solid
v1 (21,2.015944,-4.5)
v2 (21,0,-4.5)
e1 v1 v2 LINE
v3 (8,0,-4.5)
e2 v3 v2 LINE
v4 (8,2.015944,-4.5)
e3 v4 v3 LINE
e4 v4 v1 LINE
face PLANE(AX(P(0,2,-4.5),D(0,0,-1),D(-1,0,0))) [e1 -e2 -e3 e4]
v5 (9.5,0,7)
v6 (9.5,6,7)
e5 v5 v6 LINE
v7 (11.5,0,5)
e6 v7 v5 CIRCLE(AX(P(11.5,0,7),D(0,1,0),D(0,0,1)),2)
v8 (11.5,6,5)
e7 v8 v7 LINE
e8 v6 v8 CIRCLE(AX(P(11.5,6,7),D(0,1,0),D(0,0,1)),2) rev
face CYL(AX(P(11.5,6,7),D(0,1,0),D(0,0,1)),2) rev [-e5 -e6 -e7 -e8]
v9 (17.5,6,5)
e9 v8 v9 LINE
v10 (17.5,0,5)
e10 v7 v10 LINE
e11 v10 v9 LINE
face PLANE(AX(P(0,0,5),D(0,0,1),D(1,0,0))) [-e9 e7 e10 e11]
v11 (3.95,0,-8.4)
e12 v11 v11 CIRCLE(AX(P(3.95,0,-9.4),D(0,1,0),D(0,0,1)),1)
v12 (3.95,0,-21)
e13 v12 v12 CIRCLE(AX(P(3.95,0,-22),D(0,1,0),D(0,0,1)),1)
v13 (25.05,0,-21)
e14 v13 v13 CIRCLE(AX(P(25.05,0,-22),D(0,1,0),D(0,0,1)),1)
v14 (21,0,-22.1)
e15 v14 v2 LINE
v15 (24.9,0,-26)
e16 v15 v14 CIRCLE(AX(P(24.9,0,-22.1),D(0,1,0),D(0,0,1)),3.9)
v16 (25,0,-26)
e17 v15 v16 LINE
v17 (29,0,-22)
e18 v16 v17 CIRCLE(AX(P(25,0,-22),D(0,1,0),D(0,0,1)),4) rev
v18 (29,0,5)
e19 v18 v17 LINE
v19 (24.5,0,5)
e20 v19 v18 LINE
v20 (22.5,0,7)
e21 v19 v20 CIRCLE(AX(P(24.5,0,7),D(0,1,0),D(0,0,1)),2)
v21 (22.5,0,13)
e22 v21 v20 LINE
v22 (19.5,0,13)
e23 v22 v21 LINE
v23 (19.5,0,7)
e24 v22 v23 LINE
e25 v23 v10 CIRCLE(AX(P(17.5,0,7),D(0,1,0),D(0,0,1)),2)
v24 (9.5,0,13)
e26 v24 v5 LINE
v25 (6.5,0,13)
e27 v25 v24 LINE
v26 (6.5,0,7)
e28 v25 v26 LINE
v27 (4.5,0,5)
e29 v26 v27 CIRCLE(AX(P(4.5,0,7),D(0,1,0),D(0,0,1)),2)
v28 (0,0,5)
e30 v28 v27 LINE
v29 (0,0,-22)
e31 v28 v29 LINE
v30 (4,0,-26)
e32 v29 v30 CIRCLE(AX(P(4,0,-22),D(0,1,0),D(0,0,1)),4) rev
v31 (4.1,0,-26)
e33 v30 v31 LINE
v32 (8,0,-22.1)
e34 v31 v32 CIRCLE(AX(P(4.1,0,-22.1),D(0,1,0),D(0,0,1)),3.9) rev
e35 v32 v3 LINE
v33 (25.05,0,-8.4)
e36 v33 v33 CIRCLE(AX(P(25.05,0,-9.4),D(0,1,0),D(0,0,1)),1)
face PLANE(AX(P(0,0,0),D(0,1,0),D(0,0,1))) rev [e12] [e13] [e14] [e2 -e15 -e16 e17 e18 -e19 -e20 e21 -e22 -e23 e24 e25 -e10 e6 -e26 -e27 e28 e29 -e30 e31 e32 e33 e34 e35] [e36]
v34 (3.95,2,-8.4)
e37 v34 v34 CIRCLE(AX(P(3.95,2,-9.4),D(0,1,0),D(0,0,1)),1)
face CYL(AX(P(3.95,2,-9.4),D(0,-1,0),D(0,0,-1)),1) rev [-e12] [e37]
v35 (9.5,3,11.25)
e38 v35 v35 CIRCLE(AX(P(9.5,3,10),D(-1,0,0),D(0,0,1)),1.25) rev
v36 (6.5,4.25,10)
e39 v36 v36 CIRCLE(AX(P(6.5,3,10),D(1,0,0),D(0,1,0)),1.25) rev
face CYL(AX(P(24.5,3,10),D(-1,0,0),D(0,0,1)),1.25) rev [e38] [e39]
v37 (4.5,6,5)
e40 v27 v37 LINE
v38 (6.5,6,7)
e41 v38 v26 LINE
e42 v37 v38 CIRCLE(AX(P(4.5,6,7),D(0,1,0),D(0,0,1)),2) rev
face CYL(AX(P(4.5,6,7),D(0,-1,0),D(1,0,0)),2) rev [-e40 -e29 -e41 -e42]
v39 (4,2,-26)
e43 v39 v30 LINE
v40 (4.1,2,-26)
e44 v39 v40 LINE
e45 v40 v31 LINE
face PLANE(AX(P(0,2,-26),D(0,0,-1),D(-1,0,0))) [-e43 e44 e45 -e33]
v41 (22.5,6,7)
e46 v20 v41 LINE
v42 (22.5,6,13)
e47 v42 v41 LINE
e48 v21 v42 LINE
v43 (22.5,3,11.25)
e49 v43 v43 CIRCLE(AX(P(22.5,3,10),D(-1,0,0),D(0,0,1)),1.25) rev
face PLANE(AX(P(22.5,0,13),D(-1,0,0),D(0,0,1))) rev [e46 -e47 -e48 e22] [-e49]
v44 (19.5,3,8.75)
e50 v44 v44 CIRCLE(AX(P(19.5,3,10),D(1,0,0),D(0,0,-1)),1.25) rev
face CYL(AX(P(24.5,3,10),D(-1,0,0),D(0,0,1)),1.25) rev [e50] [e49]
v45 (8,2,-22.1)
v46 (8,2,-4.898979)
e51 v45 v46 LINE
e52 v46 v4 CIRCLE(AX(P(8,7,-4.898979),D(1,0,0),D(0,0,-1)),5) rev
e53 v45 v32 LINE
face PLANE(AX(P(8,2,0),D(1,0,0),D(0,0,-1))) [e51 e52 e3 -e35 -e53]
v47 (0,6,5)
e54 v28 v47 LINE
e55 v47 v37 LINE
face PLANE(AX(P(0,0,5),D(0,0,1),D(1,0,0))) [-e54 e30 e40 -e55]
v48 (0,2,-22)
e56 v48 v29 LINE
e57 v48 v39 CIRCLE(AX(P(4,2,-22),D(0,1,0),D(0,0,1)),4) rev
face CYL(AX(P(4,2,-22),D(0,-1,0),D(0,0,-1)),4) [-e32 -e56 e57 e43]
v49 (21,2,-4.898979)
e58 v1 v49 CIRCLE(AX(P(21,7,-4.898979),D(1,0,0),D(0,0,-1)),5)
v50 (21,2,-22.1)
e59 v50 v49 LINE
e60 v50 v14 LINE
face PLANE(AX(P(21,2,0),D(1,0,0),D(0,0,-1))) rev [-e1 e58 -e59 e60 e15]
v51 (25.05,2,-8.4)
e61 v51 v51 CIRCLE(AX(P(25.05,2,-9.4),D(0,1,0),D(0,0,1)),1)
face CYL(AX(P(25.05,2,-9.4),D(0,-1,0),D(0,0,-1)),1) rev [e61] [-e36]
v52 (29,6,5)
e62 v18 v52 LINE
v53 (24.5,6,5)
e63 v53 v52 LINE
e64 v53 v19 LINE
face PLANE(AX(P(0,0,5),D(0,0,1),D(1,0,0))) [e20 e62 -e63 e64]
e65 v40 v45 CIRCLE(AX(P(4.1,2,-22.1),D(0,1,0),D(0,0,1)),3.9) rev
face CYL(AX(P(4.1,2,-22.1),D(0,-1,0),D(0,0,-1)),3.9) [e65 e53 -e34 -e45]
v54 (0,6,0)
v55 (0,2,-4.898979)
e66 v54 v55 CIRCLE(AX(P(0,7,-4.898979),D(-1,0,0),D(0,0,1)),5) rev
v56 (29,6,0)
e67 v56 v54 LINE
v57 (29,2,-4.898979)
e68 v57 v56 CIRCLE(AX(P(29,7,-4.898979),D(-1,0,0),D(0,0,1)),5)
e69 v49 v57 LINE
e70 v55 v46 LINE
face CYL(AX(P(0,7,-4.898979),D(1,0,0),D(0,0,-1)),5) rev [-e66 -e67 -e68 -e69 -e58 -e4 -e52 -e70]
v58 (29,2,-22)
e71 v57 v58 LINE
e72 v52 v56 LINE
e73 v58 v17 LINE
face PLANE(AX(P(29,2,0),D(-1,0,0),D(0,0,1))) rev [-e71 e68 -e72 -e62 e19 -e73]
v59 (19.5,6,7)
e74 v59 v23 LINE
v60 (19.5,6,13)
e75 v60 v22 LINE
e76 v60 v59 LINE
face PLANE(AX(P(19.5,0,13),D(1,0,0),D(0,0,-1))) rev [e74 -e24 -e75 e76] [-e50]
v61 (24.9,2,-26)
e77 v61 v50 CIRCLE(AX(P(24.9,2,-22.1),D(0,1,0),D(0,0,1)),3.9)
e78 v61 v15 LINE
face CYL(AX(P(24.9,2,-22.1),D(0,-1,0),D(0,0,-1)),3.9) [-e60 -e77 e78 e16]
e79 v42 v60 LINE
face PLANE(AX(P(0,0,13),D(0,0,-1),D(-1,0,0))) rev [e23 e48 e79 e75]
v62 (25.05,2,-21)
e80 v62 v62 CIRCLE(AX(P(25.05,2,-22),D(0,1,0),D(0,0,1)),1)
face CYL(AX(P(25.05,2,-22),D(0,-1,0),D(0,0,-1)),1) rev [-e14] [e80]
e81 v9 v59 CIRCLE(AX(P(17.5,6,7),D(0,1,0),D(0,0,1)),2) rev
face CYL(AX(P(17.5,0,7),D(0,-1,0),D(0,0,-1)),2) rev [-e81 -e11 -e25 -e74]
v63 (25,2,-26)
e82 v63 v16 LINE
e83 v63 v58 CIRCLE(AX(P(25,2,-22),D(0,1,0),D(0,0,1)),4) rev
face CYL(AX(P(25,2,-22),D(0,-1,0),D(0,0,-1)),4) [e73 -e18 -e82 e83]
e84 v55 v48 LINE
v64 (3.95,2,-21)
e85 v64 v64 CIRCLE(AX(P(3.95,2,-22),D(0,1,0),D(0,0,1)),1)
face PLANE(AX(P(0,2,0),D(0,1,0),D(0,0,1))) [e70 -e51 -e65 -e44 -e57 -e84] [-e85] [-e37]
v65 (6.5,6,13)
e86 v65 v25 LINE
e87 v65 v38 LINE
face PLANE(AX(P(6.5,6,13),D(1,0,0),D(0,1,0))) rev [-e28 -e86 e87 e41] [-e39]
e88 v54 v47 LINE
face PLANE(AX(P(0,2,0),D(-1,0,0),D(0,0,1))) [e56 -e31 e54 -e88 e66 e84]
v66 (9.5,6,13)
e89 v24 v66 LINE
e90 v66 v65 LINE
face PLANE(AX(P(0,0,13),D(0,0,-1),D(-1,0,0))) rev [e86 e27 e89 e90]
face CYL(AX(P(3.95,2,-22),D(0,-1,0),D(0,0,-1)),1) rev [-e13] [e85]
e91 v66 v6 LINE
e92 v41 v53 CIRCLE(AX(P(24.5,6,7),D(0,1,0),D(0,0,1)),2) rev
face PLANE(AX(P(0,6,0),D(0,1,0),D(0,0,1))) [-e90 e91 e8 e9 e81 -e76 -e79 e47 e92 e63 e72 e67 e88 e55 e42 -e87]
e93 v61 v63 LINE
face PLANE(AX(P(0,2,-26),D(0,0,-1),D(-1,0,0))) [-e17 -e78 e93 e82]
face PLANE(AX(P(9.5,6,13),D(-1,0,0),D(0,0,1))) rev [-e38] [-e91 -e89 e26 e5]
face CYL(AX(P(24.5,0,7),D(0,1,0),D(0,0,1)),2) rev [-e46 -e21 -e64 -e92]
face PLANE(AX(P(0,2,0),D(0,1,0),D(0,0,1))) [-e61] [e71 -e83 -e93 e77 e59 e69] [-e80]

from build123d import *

# Parameters (mm, degrees)
SKETCH1_R                = 1
BOSS_EXTRUDE1_DEPTH      = 2
BOSS_EXTRUDE2_DEPTH      = 4
BOSS_EXTRUDE2_DEPTH_BACK = 2
SKETCH2_W                = 29
SKETCH2_H                = 5
FILLET1_R                = 5
SKETCH3_W                = 3
SKETCH3_H                = 6
BOSS_EXTRUDE3_DEPTH      = 8
FILLET2_R                = 2
CUT_EXTRUDE1_DEPTH       = 15
CUT_EXTRUDE1_DEPTH_BACK  = 7
SKETCH4_R                = 1.25


with BuildPart() as part:
    # Sketch1 → Boss-Extrude1 (new body)
    with BuildSketch(Plane(origin=(0, 0, 0), x_dir=(1, 0, 0), z_dir=(0, 1, 0))):
        with BuildLine():
            Line((24.9, 26), (25, 26))
            ThreePointArc((25, 26), (27.828427125, 24.828427125), (29, 22))
            Line((29, 22), (29, 0))
            Line((29, 0), (0, 0))
            Line((0, 0), (0, 22))
            ThreePointArc((0, 22), (1.171572875, 24.828427125), (4, 26))
            Line((4, 26), (4.1, 26))
            ThreePointArc((4.1, 26), (6.857716447, 24.857716447), (8, 22.1))
            Line((8, 22.1), (8, 4.5))
            Line((8, 4.5), (21, 4.5))
            Line((21, 4.5), (21, 22.1))
            ThreePointArc((21, 22.1), (22.142283553, 24.857716447), (24.9, 26))
        make_face()
        with Locations(Location((3.95, 22, 0), (0, 0, 270))):
            Circle(SKETCH1_R, mode=Mode.SUBTRACT)
        with Locations(Location((25.05, 22, 0), (0, 0, 270))):
            Circle(SKETCH1_R, mode=Mode.SUBTRACT)
        with Locations(Location((25.05, 9.4, 0), (0, 0, 270))):
            Circle(SKETCH1_R, mode=Mode.SUBTRACT)
        with Locations(Location((3.95, 9.4, 0), (0, 0, 270))):
            Circle(SKETCH1_R, mode=Mode.SUBTRACT)
    extrude(amount=BOSS_EXTRUDE1_DEPTH)

    # Sketch2 → Boss-Extrude2 (add, two sides: drawn at the far end of the back side and taken through both)
    with BuildSketch(Plane(origin=(0, 2, 0), x_dir=(1, 0, 0), z_dir=(0, 1, 0)).offset(-BOSS_EXTRUDE2_DEPTH_BACK)):
        with Locations((14.5, -2.5)):
            Rectangle(SKETCH2_W, SKETCH2_H)
    extrude(amount=BOSS_EXTRUDE2_DEPTH + BOSS_EXTRUDE2_DEPTH_BACK)

    # Fillet1
    # the kernel refuses this fillet: 5 mm, written as the material it adds along each edge
    with BuildSketch(Plane(origin=(29, 2, 0), x_dir=(0, 0, -1), z_dir=(-1, 0, 0))) as fillet1_piece_1_section:
        with BuildLine():
            CenterArc((4.898979486, -5), FILLET1_R, 90, 78.463040967)
            Line((0, -4), (0, 0))
            Line((0, 0), (4.898979486, 0))
        make_face()
    fillet1_piece_1 = extrude(amount=41.247448714, mode=Mode.PRIVATE)
    fillet1_piece_1 = split(fillet1_piece_1, bisect_by=Plane(origin=(21, 2, 0), z_dir=(1, 0, 0)), keep=Keep.TOP, mode=Mode.PRIVATE)
    add(fillet1_piece_1)
    with BuildSketch(Plane(origin=(29, 2, 0), x_dir=(0, 0, -1), z_dir=(-1, 0, 0))) as fillet1_piece_2_section:
        with BuildLine():
            CenterArc((4.898979486, -5), FILLET1_R, 90, 78.463040967)
            Line((0, -4), (0, 0))
            Line((0, 0), (4.898979486, 0))
        make_face()
    fillet1_piece_2 = extrude(amount=29, mode=Mode.PRIVATE)
    fillet1_piece_2 = split(fillet1_piece_2, bisect_by=Plane(origin=(29, 2, -4.5), z_dir=(0, 0, 1)), keep=Keep.TOP, mode=Mode.PRIVATE)
    add(fillet1_piece_2)
    with BuildSketch(Plane(origin=(41.247448714, 2, 0), x_dir=(0, 0, -1), z_dir=(-1, 0, 0))) as fillet1_piece_3_section:
        with BuildLine():
            CenterArc((4.898979486, -5), FILLET1_R, 90, 78.463040967)
            Line((0, -4), (0, 0))
            Line((0, 0), (4.898979486, 0))
        make_face()
    fillet1_piece_3 = extrude(amount=41.247448714, mode=Mode.PRIVATE)
    fillet1_piece_3 = split(fillet1_piece_3, bisect_by=Plane(origin=(8, 2, 0), z_dir=(-1, 0, 0)), keep=Keep.TOP, mode=Mode.PRIVATE)
    add(fillet1_piece_3)

    # Sketch3 → Boss-Extrude3 (add)
    with BuildSketch(Plane.XY.offset(5)):
        with Locations((8, 3)):
            Rectangle(SKETCH3_W, SKETCH3_H)
        with Locations((21, 3)):
            Rectangle(SKETCH3_W, SKETCH3_H)
    extrude(amount=BOSS_EXTRUDE3_DEPTH)

    # Fillet2
    fillet2_edges = [part.edges().sort_by_distance(p)[0] for p in [
        (9.5, 3, 5),
        (6.5, 3, 5),
        (19.5, 3, 5),
        (22.5, 3, 5),
    ]]
    fillet(fillet2_edges, radius=FILLET2_R)

    # Sketch4 → Cut-Extrude1 (cut, two sides: drawn at the far end of the back side and taken through both)
    with BuildSketch(Plane(origin=(9.5, 0, 0), x_dir=(0, 0, -1), z_dir=(1, 0, 0)).offset(-CUT_EXTRUDE1_DEPTH_BACK)):
        with Locations(Location((-10, 3, 0), (0, 0, 180))):
            Circle(SKETCH4_R)
    extrude(amount=CUT_EXTRUDE1_DEPTH + CUT_EXTRUDE1_DEPTH_BACK, mode=Mode.SUBTRACT)


solid = part.part
